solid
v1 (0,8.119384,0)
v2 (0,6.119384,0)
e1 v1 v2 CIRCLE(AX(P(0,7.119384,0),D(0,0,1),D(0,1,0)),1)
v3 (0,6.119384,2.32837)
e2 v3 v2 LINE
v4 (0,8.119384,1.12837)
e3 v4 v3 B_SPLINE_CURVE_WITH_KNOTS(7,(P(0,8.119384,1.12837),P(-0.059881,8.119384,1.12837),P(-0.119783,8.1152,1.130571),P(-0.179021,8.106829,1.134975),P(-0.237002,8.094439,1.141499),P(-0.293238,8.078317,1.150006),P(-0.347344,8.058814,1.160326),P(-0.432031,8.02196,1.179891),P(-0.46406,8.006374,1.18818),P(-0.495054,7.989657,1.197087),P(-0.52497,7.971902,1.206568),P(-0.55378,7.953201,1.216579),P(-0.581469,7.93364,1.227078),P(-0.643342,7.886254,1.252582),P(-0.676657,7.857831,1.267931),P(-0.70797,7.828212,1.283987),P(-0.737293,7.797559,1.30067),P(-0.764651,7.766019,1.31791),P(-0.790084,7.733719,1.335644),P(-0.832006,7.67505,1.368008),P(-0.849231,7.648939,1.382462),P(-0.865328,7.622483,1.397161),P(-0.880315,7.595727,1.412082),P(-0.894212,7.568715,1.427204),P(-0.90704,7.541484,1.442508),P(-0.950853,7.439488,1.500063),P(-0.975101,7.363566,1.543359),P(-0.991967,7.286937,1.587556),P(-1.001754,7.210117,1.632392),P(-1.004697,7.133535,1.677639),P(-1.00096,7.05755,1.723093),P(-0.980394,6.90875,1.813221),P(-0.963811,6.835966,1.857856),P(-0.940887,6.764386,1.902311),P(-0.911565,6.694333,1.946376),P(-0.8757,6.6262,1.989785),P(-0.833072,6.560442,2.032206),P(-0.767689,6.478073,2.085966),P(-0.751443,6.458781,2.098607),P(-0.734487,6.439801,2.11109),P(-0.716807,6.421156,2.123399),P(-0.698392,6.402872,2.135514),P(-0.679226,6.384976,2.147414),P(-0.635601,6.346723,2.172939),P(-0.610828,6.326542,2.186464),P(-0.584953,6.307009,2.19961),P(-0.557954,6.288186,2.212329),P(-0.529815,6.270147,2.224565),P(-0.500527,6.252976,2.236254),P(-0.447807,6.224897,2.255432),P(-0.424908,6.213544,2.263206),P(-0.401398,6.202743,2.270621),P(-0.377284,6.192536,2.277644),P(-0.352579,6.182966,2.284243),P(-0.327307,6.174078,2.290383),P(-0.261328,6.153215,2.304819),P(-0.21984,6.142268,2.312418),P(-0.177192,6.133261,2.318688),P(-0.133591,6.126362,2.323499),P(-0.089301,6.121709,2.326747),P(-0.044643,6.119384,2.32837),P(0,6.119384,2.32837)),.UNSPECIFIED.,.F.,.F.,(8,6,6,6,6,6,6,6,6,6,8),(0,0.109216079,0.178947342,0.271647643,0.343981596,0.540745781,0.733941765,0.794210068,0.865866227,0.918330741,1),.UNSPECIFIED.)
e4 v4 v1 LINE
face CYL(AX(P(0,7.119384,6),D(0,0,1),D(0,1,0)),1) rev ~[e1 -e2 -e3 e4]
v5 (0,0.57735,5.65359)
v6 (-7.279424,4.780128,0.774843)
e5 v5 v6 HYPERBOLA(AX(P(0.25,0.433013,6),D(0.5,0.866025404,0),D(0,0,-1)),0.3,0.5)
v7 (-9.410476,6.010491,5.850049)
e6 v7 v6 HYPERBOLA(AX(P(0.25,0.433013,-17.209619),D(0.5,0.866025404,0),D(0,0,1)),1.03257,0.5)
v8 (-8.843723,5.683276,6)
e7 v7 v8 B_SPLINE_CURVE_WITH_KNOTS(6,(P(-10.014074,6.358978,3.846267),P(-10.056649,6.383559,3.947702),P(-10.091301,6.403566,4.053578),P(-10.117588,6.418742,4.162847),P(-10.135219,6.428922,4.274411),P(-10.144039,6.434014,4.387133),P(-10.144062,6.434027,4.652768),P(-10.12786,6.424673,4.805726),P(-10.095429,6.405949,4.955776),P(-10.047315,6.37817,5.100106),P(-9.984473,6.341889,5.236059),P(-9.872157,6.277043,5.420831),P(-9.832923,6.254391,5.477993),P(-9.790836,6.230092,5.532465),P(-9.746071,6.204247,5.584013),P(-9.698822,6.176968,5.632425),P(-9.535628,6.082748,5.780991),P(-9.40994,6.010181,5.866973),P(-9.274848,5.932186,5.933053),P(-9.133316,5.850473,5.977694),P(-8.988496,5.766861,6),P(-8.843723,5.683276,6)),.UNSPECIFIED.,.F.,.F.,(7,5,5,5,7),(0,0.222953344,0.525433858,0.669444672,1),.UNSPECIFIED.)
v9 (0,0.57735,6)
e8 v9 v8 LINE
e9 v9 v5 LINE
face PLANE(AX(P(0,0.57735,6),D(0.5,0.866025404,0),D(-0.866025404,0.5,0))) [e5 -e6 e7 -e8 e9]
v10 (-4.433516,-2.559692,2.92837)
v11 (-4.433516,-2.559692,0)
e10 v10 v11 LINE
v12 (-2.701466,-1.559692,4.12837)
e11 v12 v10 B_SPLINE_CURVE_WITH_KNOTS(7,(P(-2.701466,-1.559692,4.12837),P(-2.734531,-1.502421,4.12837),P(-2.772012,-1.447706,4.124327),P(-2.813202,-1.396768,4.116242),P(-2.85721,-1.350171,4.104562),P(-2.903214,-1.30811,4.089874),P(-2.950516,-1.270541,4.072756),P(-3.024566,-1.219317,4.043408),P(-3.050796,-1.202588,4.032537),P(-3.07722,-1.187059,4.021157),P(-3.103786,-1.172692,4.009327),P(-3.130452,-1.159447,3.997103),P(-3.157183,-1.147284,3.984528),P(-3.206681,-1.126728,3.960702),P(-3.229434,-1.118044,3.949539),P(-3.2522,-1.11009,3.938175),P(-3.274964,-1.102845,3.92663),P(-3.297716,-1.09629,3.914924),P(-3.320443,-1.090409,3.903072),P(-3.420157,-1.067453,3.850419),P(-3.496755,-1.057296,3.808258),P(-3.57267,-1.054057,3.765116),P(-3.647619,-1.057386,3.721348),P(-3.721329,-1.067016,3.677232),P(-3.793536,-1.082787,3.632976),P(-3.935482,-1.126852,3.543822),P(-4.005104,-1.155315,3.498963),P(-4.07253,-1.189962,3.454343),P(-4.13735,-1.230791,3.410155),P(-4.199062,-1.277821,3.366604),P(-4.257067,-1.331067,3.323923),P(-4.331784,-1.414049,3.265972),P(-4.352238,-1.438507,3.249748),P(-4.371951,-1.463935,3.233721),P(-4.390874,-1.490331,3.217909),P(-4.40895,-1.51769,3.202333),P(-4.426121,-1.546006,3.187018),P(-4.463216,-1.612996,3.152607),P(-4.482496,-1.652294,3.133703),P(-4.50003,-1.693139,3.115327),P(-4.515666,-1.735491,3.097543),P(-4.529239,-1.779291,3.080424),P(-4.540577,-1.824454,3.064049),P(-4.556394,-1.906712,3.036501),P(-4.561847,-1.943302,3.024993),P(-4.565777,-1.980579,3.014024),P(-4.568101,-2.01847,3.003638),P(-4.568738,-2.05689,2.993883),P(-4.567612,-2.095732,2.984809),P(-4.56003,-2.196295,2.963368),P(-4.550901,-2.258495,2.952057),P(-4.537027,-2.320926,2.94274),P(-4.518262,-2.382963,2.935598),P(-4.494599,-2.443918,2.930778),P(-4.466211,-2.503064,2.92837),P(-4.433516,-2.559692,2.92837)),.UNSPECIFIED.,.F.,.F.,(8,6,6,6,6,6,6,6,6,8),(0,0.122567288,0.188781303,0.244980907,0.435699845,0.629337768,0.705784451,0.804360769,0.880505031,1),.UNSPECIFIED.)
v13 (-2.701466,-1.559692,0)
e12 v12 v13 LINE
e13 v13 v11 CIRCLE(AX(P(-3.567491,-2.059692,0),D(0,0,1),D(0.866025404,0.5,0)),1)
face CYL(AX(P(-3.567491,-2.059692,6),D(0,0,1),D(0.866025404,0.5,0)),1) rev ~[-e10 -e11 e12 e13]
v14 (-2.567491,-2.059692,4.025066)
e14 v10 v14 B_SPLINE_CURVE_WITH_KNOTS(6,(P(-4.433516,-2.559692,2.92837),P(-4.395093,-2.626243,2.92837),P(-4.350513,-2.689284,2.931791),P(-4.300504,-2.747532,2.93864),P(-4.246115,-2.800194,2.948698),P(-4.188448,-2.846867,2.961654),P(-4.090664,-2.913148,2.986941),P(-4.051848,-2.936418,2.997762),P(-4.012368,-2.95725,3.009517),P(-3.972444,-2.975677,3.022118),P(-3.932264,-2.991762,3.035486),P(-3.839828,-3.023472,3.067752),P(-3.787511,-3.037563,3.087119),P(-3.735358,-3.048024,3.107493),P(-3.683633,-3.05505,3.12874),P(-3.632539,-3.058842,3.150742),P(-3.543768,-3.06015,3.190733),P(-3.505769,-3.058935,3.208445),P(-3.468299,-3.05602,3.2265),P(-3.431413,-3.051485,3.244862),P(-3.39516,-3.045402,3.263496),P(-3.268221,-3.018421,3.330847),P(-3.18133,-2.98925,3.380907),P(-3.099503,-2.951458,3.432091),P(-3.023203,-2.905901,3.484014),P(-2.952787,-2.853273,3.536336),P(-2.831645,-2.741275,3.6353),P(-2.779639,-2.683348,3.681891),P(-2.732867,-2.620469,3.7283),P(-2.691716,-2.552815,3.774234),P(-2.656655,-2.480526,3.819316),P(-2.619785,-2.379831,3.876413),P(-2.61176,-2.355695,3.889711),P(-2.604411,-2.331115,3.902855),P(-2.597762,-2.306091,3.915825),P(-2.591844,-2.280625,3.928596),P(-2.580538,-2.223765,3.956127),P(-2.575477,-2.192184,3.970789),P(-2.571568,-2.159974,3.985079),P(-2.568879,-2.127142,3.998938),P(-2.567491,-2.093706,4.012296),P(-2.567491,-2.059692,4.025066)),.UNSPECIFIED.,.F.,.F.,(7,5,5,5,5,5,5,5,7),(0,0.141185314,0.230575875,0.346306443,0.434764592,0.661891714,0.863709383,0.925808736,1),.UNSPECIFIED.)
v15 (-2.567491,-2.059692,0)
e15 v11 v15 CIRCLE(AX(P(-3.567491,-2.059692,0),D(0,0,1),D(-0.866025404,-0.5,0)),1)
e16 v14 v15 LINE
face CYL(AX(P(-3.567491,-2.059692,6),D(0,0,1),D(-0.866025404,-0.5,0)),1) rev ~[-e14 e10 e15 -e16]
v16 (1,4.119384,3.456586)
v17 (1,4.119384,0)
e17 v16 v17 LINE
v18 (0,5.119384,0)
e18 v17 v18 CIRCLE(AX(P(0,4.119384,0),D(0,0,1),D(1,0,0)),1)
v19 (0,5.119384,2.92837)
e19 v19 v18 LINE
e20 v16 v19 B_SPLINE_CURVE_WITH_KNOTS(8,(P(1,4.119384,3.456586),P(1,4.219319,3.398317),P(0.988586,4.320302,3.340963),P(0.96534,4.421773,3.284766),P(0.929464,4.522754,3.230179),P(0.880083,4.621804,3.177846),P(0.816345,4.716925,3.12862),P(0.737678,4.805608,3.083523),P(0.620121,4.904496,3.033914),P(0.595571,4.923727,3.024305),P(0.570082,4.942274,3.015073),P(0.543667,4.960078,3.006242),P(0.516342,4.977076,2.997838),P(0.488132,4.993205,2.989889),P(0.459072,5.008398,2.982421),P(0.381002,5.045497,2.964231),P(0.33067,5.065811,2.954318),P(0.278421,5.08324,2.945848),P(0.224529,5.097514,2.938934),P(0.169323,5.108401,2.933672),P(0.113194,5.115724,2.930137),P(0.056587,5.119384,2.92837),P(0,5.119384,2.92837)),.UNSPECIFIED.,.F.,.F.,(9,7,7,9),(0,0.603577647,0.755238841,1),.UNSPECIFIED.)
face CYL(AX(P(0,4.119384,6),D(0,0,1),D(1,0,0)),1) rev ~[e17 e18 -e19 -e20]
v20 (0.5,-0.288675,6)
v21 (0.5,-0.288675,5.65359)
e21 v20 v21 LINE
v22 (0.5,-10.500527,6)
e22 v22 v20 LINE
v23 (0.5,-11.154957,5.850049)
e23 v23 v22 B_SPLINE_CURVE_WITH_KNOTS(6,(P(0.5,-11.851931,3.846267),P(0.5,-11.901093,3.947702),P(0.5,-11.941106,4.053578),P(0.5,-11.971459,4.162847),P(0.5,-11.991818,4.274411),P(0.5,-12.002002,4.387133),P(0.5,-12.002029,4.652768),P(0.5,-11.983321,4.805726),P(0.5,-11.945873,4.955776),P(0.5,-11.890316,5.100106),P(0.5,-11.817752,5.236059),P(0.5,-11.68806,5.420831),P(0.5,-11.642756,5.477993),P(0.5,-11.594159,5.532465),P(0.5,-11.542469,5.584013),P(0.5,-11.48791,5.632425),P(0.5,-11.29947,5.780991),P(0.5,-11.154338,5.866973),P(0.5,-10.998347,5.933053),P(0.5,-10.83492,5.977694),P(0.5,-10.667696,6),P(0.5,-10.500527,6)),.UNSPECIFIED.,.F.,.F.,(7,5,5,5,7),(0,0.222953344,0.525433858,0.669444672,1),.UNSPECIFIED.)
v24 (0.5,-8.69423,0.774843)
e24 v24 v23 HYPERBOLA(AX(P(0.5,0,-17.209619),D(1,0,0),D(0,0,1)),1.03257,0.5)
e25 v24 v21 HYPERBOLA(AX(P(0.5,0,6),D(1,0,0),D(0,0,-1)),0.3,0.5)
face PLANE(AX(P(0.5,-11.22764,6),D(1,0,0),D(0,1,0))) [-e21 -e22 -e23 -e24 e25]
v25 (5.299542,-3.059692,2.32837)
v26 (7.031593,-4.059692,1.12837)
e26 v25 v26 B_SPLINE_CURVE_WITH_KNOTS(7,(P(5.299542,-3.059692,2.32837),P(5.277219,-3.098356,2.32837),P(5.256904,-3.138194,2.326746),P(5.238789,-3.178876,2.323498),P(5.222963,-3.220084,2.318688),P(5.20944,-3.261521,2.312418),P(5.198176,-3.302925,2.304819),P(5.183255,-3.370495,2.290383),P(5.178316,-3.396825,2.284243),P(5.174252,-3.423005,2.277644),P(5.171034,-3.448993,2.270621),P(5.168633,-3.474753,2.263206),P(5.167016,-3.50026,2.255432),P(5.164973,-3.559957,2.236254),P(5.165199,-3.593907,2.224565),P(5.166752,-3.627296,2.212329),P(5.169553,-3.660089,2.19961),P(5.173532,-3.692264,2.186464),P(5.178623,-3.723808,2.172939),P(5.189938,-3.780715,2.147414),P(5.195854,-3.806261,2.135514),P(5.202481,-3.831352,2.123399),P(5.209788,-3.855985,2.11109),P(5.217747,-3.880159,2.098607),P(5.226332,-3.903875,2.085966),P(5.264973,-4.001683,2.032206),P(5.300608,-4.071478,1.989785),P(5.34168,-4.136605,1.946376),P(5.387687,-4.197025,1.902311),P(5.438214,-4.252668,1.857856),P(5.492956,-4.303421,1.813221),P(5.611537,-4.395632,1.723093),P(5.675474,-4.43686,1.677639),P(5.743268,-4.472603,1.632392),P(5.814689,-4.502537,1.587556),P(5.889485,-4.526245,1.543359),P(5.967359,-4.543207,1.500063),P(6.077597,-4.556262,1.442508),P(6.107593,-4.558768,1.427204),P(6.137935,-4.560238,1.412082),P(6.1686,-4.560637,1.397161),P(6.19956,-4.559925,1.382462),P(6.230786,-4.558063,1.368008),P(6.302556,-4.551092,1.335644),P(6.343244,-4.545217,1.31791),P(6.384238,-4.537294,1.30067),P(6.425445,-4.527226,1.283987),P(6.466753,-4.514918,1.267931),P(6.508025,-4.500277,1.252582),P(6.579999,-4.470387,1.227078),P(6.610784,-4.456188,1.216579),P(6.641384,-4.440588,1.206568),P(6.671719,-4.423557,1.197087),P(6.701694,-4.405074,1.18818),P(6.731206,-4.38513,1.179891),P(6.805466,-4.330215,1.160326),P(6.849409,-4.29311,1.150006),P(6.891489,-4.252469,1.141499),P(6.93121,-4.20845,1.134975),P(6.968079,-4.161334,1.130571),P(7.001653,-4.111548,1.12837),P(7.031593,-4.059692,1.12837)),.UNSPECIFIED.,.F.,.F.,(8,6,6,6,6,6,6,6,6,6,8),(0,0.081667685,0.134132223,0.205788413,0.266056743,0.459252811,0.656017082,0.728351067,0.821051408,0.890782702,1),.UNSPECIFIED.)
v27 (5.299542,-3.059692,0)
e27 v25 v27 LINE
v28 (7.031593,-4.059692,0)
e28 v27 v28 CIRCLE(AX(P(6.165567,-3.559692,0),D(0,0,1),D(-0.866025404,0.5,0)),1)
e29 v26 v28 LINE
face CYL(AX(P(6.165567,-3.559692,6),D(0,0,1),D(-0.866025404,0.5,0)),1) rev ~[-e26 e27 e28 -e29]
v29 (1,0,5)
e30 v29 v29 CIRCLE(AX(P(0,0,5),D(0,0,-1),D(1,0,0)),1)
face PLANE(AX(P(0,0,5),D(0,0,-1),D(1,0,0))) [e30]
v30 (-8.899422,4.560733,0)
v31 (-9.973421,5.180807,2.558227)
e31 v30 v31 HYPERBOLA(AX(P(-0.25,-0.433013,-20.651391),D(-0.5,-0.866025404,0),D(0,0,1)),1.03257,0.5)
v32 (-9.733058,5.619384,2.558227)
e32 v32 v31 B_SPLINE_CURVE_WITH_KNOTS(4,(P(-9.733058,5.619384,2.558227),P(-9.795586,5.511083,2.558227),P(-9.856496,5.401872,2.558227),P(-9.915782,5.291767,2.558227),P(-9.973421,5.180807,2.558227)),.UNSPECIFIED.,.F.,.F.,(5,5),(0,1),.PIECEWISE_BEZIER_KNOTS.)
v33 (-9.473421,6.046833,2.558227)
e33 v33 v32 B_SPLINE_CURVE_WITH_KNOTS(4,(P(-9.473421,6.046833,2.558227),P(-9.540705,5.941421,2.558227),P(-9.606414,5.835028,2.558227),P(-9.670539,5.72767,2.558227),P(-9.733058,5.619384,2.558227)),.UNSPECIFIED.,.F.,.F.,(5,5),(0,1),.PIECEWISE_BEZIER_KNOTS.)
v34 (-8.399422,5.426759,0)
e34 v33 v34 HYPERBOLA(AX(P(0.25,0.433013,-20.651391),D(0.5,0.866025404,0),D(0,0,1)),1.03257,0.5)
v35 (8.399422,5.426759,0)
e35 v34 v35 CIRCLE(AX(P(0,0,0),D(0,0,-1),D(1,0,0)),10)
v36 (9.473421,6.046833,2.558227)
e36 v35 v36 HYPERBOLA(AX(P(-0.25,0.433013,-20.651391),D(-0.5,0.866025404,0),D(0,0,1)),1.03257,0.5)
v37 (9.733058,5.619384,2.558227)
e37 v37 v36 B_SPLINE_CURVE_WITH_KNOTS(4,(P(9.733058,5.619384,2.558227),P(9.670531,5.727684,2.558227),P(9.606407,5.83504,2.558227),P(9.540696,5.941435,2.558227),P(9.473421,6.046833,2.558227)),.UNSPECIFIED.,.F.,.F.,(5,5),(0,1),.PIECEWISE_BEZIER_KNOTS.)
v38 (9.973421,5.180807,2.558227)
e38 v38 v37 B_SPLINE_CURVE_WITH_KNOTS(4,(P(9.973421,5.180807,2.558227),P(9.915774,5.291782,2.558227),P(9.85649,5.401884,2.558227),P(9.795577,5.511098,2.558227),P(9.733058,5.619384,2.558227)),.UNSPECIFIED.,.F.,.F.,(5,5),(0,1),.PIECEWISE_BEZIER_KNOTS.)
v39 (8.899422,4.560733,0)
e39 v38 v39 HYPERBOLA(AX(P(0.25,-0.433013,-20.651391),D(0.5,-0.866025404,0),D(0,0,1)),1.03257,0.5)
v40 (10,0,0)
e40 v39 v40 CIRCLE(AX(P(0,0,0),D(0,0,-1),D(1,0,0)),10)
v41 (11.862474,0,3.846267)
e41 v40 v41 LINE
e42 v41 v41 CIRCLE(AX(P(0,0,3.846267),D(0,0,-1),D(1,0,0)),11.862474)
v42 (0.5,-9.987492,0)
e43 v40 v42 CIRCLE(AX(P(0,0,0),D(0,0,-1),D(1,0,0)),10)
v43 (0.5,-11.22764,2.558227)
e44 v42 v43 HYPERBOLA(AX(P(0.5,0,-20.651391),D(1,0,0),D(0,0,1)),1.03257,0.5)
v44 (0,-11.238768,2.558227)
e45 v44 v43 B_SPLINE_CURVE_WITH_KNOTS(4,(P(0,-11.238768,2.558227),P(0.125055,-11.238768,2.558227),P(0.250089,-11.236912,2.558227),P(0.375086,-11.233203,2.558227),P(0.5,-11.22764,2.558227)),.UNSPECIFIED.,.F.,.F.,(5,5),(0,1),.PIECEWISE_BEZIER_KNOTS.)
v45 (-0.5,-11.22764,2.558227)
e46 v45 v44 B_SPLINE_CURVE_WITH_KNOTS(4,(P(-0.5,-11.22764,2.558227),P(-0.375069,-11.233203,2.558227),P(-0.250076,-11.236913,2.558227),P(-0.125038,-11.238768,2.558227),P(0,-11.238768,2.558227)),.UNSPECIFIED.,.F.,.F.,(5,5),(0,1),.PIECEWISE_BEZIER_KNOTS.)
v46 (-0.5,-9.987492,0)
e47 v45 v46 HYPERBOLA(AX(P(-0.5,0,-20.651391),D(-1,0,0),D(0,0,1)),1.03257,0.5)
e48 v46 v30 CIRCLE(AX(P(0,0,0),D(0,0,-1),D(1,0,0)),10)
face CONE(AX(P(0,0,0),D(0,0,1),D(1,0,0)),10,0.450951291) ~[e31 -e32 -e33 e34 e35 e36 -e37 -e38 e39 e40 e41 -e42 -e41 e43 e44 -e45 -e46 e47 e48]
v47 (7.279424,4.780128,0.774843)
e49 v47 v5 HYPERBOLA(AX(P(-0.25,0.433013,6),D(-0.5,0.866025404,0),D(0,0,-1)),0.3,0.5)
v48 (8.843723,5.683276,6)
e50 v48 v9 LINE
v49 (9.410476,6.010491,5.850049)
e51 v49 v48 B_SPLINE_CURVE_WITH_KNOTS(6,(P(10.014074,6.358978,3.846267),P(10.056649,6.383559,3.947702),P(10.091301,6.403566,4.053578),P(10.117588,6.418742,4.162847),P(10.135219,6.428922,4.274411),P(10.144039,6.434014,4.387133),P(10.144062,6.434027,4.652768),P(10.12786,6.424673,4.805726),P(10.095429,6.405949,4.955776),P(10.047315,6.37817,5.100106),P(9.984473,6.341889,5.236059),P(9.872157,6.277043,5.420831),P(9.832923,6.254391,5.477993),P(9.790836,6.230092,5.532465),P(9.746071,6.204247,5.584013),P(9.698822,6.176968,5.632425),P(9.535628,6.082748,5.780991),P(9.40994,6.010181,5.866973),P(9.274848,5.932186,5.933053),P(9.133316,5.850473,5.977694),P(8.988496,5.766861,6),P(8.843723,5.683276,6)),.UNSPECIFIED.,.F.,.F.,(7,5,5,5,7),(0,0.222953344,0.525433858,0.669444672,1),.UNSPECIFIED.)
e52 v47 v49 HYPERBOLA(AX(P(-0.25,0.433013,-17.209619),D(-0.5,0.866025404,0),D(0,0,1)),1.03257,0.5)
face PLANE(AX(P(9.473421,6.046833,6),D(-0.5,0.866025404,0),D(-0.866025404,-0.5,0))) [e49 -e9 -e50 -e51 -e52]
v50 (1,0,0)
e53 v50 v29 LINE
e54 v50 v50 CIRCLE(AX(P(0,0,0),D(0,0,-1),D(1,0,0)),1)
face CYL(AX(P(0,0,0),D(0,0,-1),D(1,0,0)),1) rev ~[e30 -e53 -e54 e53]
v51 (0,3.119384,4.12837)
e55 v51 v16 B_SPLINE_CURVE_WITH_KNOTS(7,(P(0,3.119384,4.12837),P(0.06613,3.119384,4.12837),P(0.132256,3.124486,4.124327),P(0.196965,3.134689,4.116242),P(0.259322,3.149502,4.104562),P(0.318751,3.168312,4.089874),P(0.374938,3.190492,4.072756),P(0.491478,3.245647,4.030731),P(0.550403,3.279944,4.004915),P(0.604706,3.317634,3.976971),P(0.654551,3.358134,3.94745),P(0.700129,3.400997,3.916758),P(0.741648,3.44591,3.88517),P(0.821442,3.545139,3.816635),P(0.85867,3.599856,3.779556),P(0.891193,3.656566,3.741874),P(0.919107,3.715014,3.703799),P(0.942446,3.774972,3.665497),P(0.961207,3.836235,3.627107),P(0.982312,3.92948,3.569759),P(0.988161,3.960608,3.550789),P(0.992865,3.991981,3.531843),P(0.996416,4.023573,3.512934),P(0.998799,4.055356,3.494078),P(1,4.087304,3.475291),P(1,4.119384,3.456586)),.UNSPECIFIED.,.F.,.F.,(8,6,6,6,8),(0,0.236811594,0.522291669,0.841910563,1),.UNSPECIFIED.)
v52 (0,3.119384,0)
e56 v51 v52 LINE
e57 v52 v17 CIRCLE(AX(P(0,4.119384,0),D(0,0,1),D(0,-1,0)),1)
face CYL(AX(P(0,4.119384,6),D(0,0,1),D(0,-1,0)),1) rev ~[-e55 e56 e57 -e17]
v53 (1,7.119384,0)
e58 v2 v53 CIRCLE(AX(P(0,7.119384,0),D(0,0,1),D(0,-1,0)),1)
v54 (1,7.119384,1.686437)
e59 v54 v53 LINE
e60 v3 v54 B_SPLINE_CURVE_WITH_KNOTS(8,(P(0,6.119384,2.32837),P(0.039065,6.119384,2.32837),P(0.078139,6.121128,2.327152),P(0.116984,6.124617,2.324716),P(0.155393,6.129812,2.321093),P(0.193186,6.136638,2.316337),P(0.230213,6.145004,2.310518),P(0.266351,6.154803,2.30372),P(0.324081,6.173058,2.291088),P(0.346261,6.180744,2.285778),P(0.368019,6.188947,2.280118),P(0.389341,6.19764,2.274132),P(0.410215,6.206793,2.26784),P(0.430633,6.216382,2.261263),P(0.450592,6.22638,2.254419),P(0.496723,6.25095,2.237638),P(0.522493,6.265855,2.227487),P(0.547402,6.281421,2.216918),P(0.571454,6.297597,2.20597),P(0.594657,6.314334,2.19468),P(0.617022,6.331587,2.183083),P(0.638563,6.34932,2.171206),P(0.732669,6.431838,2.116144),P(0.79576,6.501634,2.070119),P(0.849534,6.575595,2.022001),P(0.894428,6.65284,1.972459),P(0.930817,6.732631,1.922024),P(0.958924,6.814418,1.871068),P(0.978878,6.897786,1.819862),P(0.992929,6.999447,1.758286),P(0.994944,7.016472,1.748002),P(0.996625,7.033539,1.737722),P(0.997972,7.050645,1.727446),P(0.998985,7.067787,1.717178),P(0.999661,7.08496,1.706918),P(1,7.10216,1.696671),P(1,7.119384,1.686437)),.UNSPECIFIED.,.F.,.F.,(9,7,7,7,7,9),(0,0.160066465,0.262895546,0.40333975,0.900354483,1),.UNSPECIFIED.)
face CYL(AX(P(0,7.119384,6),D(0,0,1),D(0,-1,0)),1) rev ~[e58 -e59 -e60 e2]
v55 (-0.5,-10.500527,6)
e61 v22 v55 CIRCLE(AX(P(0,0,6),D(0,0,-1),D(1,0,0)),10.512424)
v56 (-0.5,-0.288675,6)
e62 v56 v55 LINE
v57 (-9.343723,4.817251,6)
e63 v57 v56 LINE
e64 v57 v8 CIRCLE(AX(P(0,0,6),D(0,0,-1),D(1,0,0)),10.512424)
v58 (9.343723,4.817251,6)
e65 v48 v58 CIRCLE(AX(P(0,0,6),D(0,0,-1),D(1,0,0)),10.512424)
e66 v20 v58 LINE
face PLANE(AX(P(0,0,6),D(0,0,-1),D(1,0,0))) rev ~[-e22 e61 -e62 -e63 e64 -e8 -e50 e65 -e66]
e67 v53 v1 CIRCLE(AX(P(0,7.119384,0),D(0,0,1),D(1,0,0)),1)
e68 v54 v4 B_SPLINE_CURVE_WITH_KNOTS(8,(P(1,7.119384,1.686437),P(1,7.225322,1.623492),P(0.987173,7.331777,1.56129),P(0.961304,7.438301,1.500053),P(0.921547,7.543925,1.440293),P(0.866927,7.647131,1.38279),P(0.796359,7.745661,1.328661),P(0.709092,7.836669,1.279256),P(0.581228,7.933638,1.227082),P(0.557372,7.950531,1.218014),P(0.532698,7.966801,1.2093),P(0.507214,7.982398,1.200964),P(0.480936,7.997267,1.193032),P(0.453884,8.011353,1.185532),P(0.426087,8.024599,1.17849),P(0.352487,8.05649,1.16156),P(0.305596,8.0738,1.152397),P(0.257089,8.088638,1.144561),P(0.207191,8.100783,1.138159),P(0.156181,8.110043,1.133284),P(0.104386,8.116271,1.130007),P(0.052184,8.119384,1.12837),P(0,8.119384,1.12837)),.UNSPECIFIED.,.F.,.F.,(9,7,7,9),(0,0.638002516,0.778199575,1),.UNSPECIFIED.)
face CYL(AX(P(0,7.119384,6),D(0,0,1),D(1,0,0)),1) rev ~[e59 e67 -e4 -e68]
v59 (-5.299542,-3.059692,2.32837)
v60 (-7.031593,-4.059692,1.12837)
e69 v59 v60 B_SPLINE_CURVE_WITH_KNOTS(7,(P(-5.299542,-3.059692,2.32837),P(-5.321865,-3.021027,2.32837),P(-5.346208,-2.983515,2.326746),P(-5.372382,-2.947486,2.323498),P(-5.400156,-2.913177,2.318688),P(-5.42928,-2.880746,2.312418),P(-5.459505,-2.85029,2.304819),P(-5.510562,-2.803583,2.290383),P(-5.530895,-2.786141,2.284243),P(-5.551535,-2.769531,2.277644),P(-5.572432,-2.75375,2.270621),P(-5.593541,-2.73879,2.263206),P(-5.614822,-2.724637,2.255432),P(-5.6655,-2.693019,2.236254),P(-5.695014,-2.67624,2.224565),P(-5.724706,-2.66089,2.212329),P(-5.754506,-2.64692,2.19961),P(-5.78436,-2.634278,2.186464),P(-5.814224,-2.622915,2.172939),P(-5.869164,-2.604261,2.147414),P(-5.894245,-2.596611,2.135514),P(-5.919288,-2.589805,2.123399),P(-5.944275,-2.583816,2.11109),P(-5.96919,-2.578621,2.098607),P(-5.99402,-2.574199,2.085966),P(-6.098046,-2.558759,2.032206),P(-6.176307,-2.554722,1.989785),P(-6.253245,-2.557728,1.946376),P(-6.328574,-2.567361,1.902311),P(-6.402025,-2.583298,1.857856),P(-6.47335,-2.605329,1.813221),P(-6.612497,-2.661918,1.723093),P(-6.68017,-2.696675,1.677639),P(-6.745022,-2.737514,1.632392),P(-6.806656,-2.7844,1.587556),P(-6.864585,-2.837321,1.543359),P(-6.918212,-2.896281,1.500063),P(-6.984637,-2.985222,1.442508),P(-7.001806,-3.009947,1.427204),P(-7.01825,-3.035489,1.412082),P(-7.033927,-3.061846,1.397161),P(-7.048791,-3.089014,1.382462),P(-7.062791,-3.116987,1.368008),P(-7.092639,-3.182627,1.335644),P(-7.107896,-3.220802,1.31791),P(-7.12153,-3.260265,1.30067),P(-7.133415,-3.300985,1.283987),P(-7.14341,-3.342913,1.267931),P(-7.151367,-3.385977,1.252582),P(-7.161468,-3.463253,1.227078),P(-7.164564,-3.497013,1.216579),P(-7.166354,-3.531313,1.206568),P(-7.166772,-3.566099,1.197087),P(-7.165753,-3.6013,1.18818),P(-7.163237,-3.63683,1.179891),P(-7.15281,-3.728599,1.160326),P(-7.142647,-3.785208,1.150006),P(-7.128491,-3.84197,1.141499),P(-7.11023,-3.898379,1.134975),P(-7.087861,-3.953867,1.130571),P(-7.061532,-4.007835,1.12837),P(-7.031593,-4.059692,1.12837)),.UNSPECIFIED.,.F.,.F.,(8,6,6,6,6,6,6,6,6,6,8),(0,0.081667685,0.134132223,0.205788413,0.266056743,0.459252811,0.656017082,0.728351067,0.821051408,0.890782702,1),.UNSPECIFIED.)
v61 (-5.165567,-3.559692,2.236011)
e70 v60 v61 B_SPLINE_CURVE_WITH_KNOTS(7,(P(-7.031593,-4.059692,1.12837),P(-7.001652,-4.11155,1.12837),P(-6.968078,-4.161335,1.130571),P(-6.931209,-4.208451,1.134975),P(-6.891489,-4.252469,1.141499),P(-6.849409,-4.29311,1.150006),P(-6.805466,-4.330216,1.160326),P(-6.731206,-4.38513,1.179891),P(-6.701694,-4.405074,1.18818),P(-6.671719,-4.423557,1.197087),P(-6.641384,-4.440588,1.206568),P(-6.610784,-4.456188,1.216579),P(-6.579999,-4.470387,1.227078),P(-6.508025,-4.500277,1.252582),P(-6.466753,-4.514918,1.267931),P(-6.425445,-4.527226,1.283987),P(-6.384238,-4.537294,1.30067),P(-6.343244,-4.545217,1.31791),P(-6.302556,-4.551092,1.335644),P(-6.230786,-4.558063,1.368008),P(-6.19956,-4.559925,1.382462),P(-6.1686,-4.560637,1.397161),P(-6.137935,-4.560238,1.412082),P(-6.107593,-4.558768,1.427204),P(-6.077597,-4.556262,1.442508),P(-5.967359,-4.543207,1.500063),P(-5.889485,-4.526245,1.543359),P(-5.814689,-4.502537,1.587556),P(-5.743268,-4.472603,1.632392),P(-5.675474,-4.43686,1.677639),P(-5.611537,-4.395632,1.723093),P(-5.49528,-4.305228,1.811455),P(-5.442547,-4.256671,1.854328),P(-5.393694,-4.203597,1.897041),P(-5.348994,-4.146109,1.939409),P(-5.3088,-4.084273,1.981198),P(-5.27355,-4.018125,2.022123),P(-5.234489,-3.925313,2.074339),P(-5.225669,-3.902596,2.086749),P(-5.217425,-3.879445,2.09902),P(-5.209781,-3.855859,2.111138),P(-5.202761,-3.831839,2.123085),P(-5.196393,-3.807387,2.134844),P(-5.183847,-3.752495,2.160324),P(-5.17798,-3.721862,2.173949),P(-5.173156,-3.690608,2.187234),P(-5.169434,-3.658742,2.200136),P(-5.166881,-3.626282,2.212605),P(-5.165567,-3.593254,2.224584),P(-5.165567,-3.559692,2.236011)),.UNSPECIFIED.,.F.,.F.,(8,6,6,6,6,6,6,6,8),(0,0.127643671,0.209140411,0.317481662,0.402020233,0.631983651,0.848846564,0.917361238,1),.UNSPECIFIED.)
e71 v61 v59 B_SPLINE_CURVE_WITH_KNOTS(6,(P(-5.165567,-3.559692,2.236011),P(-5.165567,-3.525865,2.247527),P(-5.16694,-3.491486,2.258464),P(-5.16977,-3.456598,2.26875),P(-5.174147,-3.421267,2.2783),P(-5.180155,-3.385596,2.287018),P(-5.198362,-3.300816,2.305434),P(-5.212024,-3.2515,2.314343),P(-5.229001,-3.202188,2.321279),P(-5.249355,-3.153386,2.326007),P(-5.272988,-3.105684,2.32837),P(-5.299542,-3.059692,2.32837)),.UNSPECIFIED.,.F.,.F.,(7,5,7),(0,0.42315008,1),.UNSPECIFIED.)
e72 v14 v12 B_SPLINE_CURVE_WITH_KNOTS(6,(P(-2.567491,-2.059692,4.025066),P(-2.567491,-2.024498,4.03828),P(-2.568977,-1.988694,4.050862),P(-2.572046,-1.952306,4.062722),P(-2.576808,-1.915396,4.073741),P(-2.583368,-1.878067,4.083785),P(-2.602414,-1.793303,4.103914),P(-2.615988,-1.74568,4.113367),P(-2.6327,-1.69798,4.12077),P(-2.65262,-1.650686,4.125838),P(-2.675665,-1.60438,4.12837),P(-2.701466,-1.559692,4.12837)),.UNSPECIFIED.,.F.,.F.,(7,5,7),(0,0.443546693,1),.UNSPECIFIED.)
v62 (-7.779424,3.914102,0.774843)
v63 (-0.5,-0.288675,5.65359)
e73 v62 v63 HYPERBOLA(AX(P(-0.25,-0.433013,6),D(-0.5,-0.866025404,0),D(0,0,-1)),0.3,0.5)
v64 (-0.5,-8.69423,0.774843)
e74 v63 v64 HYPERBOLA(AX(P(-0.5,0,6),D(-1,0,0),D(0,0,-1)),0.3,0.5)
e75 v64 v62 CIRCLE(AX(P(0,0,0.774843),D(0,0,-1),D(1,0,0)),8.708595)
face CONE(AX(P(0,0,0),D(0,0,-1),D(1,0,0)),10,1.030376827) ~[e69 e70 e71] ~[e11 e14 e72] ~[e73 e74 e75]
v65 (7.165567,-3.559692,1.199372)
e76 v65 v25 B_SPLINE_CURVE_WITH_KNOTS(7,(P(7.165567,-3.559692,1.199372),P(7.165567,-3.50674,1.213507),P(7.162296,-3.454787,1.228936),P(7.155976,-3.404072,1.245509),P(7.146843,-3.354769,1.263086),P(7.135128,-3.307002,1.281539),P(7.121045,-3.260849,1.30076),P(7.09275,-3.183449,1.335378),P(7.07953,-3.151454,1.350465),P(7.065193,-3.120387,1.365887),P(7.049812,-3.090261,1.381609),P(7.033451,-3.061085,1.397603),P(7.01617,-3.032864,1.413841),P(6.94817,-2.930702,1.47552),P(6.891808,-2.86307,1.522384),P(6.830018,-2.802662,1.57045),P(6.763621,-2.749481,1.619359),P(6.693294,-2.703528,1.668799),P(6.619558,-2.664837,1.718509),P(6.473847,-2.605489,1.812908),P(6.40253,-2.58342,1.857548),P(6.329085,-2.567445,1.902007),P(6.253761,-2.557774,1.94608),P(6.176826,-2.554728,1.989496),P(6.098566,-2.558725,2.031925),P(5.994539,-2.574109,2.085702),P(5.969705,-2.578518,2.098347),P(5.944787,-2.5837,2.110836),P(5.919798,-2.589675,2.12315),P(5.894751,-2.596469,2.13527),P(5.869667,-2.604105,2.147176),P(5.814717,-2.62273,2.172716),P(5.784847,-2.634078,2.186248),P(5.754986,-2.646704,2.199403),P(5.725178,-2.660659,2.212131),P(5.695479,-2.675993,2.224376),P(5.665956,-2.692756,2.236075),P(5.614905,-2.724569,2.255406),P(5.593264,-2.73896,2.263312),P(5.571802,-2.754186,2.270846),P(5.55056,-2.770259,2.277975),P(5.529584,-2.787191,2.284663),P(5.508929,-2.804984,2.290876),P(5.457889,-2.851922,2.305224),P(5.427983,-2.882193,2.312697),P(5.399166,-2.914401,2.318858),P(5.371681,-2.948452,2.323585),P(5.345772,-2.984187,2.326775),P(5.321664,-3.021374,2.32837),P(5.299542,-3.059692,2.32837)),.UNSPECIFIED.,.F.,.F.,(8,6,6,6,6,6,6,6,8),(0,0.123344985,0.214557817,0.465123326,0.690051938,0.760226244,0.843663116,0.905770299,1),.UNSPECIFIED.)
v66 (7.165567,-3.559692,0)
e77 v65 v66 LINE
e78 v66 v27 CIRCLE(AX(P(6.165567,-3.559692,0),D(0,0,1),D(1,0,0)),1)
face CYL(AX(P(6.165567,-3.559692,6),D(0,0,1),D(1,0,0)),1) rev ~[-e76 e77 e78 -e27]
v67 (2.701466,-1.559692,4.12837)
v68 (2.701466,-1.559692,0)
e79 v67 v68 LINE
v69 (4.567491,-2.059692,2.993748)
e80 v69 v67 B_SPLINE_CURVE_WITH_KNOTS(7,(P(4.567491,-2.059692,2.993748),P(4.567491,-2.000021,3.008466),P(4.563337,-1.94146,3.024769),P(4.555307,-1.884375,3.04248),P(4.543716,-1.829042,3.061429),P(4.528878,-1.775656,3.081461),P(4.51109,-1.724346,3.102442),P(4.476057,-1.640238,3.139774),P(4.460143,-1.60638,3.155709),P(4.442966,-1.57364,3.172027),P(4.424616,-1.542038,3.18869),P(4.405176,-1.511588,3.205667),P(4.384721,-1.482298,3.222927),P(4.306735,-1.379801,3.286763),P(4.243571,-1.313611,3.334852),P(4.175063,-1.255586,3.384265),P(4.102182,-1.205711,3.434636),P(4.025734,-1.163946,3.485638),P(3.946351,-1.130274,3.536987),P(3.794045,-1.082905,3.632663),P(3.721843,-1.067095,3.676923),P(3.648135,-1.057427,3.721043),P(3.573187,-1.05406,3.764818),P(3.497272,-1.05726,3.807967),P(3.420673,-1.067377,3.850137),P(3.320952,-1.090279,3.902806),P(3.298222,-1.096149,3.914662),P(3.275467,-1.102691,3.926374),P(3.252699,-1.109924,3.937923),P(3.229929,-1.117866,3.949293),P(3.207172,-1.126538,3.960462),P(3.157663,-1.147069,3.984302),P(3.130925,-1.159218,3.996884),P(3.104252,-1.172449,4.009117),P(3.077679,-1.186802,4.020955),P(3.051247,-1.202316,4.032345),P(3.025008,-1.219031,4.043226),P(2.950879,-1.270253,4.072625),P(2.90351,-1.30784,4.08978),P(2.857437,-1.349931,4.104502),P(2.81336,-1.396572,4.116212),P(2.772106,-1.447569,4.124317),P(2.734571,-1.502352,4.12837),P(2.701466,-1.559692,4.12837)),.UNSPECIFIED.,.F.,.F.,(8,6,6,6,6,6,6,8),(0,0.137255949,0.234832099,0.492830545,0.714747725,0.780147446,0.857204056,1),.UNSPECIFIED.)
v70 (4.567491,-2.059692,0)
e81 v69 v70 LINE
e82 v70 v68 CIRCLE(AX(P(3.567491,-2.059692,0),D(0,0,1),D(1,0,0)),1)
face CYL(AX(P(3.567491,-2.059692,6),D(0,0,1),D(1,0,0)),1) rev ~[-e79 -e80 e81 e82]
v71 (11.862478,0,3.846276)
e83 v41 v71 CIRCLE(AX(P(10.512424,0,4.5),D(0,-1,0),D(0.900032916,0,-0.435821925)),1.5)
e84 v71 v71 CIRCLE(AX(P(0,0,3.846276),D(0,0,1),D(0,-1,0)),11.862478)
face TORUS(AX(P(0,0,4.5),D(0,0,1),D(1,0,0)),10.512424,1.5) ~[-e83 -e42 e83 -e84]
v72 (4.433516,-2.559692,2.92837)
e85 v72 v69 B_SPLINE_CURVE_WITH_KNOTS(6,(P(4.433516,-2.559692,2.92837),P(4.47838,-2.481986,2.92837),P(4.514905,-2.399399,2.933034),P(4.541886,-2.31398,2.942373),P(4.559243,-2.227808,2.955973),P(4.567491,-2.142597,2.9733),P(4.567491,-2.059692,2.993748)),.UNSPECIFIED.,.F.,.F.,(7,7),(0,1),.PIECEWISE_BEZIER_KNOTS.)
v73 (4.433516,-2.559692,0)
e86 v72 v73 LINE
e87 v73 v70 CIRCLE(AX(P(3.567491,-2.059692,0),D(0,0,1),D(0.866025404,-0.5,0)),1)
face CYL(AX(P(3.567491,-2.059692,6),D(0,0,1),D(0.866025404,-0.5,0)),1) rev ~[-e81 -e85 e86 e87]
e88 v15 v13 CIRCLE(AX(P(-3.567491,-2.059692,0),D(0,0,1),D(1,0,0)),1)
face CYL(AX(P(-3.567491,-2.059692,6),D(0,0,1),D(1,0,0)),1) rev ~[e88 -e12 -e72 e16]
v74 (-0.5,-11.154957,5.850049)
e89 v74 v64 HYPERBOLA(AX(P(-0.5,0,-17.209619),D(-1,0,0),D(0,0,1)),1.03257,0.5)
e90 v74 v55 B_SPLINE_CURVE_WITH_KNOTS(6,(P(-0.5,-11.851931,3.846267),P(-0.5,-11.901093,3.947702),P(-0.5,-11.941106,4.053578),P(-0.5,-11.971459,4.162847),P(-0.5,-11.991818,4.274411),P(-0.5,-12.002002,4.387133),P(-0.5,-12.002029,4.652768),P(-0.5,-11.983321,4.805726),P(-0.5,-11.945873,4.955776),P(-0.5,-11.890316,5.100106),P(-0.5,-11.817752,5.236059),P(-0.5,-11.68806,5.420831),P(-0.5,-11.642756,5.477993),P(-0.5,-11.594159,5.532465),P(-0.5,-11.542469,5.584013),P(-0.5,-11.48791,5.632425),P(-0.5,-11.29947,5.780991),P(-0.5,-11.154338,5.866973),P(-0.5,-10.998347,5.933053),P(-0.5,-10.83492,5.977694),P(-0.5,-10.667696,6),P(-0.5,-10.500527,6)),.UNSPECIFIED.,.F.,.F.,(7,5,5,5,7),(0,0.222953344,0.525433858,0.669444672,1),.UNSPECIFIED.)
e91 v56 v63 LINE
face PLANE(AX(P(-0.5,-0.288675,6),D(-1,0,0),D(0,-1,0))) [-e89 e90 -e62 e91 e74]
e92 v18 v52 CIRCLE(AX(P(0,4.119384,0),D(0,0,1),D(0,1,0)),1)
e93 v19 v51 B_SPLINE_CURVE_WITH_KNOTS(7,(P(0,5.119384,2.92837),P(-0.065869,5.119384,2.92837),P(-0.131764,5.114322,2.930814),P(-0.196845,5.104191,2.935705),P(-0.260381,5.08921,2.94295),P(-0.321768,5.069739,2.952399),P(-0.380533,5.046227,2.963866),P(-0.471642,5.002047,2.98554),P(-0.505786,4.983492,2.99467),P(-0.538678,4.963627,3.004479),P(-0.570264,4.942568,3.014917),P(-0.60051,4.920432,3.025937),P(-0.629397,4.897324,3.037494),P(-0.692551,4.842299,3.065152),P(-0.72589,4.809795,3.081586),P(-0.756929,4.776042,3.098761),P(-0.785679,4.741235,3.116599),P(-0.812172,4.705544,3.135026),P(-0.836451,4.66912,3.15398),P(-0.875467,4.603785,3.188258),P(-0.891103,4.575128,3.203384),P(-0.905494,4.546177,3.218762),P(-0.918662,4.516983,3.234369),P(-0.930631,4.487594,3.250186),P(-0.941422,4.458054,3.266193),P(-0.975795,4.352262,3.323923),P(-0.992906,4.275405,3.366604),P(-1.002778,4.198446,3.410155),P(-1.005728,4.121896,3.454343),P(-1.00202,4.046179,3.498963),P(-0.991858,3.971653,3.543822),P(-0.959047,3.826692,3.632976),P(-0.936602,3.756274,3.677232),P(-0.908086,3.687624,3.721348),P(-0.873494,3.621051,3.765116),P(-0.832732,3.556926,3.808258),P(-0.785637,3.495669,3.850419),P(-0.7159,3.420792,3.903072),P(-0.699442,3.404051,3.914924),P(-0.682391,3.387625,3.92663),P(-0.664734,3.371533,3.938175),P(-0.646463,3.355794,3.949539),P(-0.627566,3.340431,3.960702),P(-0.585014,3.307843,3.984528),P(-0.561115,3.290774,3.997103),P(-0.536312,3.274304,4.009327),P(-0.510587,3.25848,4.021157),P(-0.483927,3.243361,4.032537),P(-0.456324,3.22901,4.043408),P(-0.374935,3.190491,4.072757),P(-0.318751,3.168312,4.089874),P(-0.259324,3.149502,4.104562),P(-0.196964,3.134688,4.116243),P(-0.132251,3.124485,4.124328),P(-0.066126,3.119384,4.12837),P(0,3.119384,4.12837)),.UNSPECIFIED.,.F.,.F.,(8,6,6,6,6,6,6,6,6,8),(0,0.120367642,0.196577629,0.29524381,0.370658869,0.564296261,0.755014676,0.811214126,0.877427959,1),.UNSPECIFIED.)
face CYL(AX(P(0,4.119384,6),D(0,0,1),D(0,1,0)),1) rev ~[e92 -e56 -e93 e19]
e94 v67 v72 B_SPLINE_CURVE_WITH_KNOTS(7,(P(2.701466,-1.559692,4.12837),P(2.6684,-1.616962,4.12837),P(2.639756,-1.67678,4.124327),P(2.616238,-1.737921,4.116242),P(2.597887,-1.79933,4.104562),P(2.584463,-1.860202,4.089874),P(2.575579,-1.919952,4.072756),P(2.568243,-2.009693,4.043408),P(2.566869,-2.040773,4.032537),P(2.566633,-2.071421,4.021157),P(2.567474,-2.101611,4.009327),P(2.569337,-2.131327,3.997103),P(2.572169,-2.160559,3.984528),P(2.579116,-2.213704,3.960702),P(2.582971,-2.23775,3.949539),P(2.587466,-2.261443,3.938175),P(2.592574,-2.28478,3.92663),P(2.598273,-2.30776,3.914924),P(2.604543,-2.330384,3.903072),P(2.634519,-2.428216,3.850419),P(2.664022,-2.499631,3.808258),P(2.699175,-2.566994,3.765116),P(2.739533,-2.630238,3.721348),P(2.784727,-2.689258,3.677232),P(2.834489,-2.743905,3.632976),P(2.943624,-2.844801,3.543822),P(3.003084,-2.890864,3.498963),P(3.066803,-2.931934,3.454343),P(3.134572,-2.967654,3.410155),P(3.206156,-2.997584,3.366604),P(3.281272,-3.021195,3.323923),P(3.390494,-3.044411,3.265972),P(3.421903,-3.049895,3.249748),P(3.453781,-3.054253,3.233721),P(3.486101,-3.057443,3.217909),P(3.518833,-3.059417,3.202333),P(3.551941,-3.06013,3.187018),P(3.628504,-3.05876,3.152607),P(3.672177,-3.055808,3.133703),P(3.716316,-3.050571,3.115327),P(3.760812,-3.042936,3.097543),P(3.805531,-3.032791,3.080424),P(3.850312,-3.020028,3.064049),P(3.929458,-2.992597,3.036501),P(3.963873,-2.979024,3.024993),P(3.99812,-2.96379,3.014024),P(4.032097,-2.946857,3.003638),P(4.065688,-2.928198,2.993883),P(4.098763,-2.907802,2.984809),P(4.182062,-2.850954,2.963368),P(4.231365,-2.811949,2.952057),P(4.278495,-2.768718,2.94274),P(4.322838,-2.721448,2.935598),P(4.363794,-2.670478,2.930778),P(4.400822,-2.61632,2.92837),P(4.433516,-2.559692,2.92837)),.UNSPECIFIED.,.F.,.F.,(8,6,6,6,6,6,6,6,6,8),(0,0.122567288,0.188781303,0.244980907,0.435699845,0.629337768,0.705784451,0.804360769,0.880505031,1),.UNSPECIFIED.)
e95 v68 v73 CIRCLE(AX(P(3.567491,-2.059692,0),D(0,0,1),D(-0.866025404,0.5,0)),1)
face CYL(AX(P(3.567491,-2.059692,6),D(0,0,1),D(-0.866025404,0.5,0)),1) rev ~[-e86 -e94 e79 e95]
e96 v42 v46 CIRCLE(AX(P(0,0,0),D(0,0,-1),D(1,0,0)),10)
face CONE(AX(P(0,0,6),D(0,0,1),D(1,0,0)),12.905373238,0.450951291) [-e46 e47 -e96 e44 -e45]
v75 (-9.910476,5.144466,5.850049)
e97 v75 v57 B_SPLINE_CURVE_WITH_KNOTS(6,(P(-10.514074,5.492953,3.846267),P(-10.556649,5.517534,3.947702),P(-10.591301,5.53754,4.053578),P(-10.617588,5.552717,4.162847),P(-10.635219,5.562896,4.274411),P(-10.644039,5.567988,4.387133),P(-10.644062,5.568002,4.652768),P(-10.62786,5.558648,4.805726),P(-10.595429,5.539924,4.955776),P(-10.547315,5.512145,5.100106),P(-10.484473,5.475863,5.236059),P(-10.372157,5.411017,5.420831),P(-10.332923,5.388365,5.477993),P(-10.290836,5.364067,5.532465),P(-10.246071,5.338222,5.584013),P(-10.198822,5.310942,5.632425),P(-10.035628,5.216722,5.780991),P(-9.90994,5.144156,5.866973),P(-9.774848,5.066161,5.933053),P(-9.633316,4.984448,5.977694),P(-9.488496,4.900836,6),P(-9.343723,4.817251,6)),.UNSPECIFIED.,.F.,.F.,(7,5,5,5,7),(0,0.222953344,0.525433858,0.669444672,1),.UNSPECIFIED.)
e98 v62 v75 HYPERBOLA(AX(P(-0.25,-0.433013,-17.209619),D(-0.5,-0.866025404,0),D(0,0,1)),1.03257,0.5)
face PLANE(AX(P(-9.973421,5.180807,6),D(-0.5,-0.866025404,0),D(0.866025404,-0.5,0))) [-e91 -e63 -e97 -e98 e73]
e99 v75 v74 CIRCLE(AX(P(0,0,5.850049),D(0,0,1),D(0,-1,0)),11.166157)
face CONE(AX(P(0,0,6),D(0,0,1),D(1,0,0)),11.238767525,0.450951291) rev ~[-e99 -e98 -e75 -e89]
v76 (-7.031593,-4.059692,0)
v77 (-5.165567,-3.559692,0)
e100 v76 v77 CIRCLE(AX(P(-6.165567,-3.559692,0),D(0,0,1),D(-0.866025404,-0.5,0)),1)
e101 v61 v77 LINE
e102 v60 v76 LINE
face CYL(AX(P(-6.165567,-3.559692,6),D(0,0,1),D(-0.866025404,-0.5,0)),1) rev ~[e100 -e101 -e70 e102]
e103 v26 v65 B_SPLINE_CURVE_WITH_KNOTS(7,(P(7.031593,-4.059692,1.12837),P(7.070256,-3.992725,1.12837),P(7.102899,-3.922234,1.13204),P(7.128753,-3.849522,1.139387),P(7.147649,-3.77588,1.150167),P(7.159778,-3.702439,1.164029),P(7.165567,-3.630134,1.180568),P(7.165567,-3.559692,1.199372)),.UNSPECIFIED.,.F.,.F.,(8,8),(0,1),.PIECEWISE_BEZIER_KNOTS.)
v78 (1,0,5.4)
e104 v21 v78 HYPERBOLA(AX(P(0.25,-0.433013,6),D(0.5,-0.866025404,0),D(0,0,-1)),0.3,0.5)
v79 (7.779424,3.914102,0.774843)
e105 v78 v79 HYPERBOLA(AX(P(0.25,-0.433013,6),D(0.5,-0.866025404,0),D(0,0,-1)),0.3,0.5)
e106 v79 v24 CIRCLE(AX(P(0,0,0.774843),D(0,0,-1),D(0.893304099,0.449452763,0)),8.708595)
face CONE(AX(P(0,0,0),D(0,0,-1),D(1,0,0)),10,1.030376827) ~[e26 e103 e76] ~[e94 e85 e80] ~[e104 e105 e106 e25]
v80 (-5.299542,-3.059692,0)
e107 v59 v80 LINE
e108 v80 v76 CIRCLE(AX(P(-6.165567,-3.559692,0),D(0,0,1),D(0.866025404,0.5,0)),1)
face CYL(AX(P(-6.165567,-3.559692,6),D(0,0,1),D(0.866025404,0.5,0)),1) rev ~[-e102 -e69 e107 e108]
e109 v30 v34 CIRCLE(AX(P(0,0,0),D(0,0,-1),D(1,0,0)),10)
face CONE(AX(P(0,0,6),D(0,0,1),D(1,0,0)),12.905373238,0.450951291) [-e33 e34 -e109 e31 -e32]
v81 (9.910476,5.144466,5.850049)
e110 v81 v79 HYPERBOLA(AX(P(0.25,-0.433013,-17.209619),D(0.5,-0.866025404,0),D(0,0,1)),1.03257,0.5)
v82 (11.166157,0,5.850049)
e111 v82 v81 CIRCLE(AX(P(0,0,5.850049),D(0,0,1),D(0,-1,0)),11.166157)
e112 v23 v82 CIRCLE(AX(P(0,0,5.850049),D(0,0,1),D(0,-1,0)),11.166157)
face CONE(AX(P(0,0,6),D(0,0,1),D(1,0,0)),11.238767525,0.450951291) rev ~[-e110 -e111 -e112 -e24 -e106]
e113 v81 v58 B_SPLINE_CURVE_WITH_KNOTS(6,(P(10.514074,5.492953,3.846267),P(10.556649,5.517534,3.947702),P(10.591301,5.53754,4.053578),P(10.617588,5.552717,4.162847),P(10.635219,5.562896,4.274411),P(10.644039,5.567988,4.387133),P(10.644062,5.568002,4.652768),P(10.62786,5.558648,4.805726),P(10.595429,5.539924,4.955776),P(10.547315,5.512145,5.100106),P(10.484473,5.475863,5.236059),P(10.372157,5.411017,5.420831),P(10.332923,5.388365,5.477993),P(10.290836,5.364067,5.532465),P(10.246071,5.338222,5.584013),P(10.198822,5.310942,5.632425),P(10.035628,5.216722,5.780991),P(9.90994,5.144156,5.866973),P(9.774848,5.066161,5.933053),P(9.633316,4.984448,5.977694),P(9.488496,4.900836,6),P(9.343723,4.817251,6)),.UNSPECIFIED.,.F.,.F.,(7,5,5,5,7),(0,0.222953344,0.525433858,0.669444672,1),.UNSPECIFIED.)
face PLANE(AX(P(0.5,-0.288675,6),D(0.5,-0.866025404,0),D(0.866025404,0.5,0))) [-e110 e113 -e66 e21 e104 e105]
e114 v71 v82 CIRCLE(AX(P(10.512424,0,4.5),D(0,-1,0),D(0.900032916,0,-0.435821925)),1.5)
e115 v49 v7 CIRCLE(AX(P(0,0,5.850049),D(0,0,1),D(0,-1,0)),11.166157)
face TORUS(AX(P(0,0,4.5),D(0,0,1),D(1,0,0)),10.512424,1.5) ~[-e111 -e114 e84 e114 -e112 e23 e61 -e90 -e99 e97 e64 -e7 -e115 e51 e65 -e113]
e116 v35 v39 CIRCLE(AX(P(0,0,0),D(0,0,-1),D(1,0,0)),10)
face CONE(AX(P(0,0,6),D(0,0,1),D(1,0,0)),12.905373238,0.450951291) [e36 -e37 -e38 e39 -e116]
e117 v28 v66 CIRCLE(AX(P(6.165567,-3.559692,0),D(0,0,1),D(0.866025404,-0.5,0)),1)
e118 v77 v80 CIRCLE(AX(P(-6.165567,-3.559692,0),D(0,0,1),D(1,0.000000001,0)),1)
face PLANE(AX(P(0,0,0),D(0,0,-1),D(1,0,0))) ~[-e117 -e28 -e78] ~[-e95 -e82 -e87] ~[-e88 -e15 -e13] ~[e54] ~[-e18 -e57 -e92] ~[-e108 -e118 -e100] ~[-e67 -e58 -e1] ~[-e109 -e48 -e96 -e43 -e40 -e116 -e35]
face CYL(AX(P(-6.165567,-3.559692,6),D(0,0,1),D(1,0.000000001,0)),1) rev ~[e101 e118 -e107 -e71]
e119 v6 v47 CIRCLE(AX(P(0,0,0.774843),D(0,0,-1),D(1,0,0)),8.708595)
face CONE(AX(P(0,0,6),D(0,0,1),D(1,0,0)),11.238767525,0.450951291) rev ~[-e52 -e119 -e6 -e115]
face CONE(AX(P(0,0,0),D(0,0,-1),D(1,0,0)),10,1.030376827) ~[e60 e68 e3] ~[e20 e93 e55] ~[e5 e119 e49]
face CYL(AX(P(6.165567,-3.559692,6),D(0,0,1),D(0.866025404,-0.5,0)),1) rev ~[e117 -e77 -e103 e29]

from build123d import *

# Parameters (mm, degrees)
F3_DEPTH = 6
F5_DEPTH = 6.0010001
F6_R     = 1
F7_DEPTH = 5


# Not quite as in the source:
# - a fillet or chamfer that OpenCascade refuses, or shapes differently, is made with other operations: its cross-section is extruded or revolved along the edge and cut away or added


with BuildPart() as f1:
    # F0 (on Front) → F1 (revolve)
    with BuildSketch(Plane.XZ):
        Polygon((0, 0), (10, 0), (8.7085954955, 0.7748427027), (0, 6), align=None)
        Polygon((8.7085954955, 0.7748427027), (10, 0), (12.905373238, 6), (11.2387675248, 6), align=None)
    revolve(axis=Axis((0, 0, 3), (0, 0, -1)))

    # F2 (on face) → F3 (join, through all)
    with BuildSketch(Plane.XY.offset(6)):
        with BuildLine():
            Line((0, -11.2387675248), (0, 0))
            Line((0, 0), (-9.7330581837, 5.6193837624))
            ThreePointArc((-9.7330581837, 5.6193837624), (-9.8556796151, 5.401432662), (-9.9734212913, 5.1808071981))
            Line((-9.9734212913, 5.1808071981), (-0.5, -0.2886751346))
            Line((-0.5, -0.2886751346), (-0.5, -11.2276397999))
            ThreePointArc((-0.5, -11.2276397999), (-0.2500619055, -11.2359852492), (0, -11.2387675248))
        make_face()
        with BuildLine():
            Line((9.7330581837, 5.6193837624), (0, 0))
            Line((0, 0), (0, -11.2387675248))
            ThreePointArc((0, -11.2387675248), (0.2500619055, -11.2359852492), (0.5, -11.2276397999))
            Line((0.5, -11.2276397999), (0.5, -0.2886751346))
            Line((0.5, -0.2886751346), (9.9734212913, 5.1808071981))
            ThreePointArc((9.9734212913, 5.1808071981), (9.8556796151, 5.401432662), (9.7330581837, 5.6193837624))
        make_face()
        with BuildLine():
            Line((-9.7330581837, 5.6193837624), (0, 0))
            Line((0, 0), (9.7330581837, 5.6193837624))
            ThreePointArc((9.7330581837, 5.6193837624), (9.6056177096, 5.8345525873), (9.4734212913, 6.0468326019))
            Line((9.4734212913, 6.0468326019), (0, 0.5773502692))
            Line((0, 0.5773502692), (-9.4734212913, 6.0468326019))
            ThreePointArc((-9.4734212913, 6.0468326019), (-9.6056177096, 5.8345525873), (-9.7330581837, 5.6193837624))
        make_face()
    extrude(amount=-F3_DEPTH)

    # F4 (on face) → F5 (cut, through all)
    with BuildSketch(Plane.XY.offset(6)):
        with BuildLine():
            ThreePointArc((7.1655671975, -3.5596918812), (6.4243862426, -2.5937660549), (5.2995417938, -3.0596918812))
            Line((5.2995417938, -3.0596918812), (7.0315926013, -4.0596918812))
            ThreePointArc((7.0315926013, -4.0596918812), (7.1314930238, -3.8185109263), (7.1655671975, -3.5596918812))
        make_face()
        with BuildLine():
            Line((7.0315926013, -4.0596918812), (5.2995417938, -3.0596918812))
            ThreePointArc((5.2995417938, -3.0596918812), (5.6655671975, -4.425717285), (7.0315926013, -4.0596918812))
        make_face()
        with BuildLine():
            ThreePointArc((4.5674909862, -2.0596918812), (3.8263100313, -1.0937660549), (2.7014655824, -1.5596918812))
            Line((2.7014655824, -1.5596918812), (4.43351639, -2.5596918812))
            ThreePointArc((4.43351639, -2.5596918812), (4.5334168125, -2.3185109263), (4.5674909862, -2.0596918812))
        make_face()
        with BuildLine():
            Line((4.43351639, -2.5596918812), (2.7014655824, -1.5596918812))
            ThreePointArc((2.7014655824, -1.5596918812), (3.0674909862, -2.925717285), (4.43351639, -2.5596918812))
        make_face()
        with BuildLine():
            ThreePointArc((-5.1655671975, -3.5596918812), (-5.1996413713, -3.3008728361), (-5.2995417938, -3.0596918812))
            Line((-5.2995417938, -3.0596918812), (-7.0315926013, -4.0596918812))
            ThreePointArc((-7.0315926013, -4.0596918812), (-5.9067481524, -4.5256177075), (-5.1655671975, -3.5596918812))
        make_face()
        with BuildLine():
            Line((-7.0315926013, -4.0596918812), (-5.2995417938, -3.0596918812))
            ThreePointArc((-5.2995417938, -3.0596918812), (-6.6655671975, -2.6936664774), (-7.0315926013, -4.0596918812))
        make_face()
        with BuildLine():
            ThreePointArc((-2.5674909862, -2.0596918812), (-2.6015651599, -1.8008728361), (-2.7014655824, -1.5596918812))
            Line((-2.7014655824, -1.5596918812), (-4.43351639, -2.5596918812))
            ThreePointArc((-4.43351639, -2.5596918812), (-3.3086719411, -3.0256177075), (-2.5674909862, -2.0596918812))
        make_face()
        with BuildLine():
            Line((-4.43351639, -2.5596918812), (-2.7014655824, -1.5596918812))
            ThreePointArc((-2.7014655824, -1.5596918812), (-4.0674909862, -1.1936664774), (-4.43351639, -2.5596918812))
        make_face()
        with BuildLine():
            ThreePointArc((0, 8.1193837624), (-1, 7.1193837624), (0, 6.1193837624))
            Line((0, 6.1193837624), (0, 8.1193837624))
        make_face()
        with BuildLine():
            Line((0, 8.1193837624), (0, 6.1193837624))
            ThreePointArc((0, 6.1193837624), (0.7071067812, 6.4122769812), (1, 7.1193837624))
            ThreePointArc((1, 7.1193837624), (0.7071067812, 7.8264905436), (0, 8.1193837624))
        make_face()
        with BuildLine():
            ThreePointArc((0, 5.1193837624), (-1, 4.1193837624), (0, 3.1193837624))
            Line((0, 3.1193837624), (0, 5.1193837624))
        make_face()
        with BuildLine():
            Line((0, 5.1193837624), (0, 3.1193837624))
            ThreePointArc((0, 3.1193837624), (0.7071067812, 3.4122769812), (1, 4.1193837624))
            ThreePointArc((1, 4.1193837624), (0.7071067812, 4.8264905436), (0, 5.1193837624))
        make_face()
    extrude(amount=-F5_DEPTH, mode=Mode.SUBTRACT)

    # F6 (on face) → F7 (cut)
    with BuildSketch(Plane(origin=(0, 0, 0), x_dir=(1, 0, 0), z_dir=(0, 0, -1))):
        Circle(F6_R)
    extrude(amount=-F7_DEPTH, mode=Mode.SUBTRACT)

    # F8: fillet of radius 1.5 on 1 edges, made by hand

    # F8_s1 → F8_t2 (revolve, cut)
    with BuildSketch(Plane.XZ):
        with BuildLine():
            ThreePointArc((11.8624735894, 3.8462671131), (11.7833686143, 5.2966808237), (10.5124242153, 6))
            Line((10.5124242153, 6), (12.905373238, 6))
            Line((12.905373238, 6), (11.8624735894, 3.8462671131))
        make_face()
    revolve(axis=Axis((0, 0, 6), (0, 0, -1)), mode=Mode.SUBTRACT)

    # F0 (on Front) → F9 (revolve, cut)
    with BuildSketch(Plane.XZ):
        Polygon((12.905373238, 6), (10, 0), (13.7833622578, 0), (16.6887354958, 6), align=None)
    revolve(axis=Axis((0, 0, 3), (0, 0, -1)), mode=Mode.SUBTRACT)


solid = f1.part
